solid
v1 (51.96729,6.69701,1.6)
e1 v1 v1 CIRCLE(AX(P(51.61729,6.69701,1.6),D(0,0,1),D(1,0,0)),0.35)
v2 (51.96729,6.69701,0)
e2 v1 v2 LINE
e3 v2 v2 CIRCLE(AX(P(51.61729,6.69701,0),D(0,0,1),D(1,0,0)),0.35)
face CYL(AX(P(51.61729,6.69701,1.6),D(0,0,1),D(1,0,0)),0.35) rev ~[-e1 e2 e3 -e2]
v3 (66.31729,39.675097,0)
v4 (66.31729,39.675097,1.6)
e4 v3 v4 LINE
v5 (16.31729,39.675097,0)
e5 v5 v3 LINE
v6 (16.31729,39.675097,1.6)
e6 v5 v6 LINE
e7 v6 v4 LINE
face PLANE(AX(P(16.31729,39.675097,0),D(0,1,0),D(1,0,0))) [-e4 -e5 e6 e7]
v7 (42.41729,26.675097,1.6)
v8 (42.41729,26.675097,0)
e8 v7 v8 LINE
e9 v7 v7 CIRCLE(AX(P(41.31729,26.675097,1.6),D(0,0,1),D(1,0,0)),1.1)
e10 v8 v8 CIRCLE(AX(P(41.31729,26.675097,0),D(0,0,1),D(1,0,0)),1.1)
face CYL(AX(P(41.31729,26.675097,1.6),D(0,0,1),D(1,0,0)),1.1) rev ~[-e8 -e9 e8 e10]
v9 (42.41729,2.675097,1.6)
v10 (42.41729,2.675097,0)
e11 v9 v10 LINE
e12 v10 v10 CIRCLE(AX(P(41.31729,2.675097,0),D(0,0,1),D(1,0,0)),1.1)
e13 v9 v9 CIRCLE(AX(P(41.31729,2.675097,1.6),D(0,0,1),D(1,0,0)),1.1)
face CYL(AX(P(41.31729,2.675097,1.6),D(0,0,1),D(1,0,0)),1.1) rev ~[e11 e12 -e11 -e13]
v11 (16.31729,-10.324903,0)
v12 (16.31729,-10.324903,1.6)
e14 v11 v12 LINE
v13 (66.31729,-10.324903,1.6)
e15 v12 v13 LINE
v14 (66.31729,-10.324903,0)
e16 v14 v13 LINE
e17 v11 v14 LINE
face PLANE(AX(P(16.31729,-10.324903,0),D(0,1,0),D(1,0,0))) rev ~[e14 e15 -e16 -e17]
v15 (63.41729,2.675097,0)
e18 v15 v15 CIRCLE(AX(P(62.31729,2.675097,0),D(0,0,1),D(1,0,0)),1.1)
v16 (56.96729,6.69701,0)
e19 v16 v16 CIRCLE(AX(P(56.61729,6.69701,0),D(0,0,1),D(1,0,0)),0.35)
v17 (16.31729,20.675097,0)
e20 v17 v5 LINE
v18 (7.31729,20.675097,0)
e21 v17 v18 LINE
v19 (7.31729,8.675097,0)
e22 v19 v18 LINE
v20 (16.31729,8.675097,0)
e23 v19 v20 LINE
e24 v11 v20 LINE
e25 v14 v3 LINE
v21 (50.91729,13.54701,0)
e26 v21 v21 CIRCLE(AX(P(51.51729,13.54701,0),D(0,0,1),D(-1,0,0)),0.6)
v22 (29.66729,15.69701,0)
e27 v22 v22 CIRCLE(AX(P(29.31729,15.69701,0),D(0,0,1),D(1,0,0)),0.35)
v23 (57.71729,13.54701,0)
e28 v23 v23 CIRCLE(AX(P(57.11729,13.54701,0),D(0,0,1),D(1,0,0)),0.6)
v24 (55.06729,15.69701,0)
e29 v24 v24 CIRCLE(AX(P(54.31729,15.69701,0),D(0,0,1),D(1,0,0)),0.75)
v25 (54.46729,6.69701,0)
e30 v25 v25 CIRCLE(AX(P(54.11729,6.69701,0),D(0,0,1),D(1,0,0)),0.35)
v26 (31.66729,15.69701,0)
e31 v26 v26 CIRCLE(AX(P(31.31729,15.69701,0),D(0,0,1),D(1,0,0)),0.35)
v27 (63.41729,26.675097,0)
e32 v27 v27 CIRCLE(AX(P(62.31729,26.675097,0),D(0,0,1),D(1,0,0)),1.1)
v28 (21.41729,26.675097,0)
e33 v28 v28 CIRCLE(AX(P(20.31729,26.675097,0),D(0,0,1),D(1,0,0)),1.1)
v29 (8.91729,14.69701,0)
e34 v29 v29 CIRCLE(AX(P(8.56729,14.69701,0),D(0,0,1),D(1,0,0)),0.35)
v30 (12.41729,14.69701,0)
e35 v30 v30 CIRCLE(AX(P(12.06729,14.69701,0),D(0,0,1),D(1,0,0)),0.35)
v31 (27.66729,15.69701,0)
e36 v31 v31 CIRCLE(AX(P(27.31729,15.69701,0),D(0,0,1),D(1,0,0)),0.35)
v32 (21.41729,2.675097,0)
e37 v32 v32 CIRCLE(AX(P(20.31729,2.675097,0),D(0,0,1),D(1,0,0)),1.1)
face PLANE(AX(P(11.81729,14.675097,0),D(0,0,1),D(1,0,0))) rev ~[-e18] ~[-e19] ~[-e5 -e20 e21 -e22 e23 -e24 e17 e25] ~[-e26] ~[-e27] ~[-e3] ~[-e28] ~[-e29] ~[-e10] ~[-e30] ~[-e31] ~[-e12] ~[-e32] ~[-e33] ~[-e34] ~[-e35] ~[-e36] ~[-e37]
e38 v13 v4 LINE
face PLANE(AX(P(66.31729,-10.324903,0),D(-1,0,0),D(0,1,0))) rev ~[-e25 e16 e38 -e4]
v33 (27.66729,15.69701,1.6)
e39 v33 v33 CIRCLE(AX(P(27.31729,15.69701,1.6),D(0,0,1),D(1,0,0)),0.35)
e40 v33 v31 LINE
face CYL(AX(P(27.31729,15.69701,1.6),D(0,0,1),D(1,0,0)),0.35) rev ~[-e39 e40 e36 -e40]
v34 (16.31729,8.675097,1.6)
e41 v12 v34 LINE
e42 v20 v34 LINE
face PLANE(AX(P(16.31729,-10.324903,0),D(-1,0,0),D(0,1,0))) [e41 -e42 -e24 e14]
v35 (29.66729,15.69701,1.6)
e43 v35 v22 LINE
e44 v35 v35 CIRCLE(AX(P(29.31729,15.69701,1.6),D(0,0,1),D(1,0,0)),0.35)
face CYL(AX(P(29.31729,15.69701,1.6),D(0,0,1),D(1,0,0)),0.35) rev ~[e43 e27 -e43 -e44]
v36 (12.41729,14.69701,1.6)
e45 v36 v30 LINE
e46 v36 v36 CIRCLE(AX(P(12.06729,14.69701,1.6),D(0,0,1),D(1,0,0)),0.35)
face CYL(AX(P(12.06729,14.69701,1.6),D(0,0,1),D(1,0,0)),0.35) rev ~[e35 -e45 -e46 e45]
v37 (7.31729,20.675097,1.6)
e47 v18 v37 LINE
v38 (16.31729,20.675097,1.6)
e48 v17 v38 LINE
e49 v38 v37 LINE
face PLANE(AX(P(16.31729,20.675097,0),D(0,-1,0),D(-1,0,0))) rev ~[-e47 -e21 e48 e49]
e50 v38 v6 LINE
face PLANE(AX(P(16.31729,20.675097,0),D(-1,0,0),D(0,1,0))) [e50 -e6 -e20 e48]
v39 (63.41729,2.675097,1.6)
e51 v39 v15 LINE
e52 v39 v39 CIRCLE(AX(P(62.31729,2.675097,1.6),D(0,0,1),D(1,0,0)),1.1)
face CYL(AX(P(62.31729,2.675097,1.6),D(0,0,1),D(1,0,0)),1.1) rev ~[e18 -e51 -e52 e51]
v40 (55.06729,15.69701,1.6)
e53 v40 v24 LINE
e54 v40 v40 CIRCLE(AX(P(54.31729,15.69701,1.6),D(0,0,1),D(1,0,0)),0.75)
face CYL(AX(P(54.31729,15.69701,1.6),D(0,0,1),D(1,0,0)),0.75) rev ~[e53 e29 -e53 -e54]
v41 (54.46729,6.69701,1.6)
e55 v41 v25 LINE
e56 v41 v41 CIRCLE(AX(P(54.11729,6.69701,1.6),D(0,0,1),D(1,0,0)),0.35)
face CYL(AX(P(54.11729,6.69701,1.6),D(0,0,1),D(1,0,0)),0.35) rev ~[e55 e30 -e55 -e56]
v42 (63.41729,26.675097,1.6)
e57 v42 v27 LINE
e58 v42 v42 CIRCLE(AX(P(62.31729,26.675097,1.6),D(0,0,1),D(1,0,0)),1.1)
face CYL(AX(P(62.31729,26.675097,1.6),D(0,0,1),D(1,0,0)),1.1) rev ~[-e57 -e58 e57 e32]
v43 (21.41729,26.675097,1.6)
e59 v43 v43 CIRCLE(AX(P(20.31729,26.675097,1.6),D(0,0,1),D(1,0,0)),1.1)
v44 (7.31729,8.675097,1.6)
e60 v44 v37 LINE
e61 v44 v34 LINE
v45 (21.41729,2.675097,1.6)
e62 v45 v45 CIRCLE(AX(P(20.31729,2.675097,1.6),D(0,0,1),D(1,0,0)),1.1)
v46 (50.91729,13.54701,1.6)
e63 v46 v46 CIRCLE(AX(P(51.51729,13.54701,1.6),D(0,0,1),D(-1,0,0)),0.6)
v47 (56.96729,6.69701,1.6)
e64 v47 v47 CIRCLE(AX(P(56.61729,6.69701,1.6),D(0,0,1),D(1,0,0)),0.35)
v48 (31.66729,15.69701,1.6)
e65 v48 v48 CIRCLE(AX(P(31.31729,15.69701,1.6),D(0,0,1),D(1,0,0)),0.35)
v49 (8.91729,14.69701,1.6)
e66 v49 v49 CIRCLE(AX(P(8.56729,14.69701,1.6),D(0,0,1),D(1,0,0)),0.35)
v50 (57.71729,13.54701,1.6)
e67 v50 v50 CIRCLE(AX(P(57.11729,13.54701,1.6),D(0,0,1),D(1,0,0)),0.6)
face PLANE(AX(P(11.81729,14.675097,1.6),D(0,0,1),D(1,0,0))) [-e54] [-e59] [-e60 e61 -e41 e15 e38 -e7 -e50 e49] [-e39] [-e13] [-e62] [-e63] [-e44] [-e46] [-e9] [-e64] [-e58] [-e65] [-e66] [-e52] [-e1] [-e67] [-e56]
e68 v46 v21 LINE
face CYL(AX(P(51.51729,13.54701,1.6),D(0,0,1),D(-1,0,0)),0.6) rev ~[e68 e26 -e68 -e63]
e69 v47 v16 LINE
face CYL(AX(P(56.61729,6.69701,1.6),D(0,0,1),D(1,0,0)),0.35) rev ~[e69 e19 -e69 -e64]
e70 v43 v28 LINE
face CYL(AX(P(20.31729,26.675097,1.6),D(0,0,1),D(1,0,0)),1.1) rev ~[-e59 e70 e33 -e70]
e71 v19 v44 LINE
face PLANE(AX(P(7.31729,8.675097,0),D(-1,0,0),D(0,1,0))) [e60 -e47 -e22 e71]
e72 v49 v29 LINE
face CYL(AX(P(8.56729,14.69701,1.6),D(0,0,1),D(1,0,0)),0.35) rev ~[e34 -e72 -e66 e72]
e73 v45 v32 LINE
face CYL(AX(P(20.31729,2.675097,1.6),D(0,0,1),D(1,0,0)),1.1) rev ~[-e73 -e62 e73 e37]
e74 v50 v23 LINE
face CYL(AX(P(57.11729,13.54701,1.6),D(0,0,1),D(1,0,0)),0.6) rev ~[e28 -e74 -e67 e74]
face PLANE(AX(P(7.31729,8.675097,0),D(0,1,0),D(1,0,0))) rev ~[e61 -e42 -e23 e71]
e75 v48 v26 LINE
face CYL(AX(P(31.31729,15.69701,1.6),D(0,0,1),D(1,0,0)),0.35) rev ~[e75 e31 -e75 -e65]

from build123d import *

# Parameters (mm, degrees)
F0_W     = 9
F0_H     = 12
F0_W_2   = 50
F0_H_2   = 19
F1_DEPTH = 1.6
F4_R     = 0.35
F5_R     = 0.35
F2_R     = 0.35
F6_DEPTH = 4
F7_R     = 1.1
F8_DEPTH = 25


# Not quite as in the source:
# - a feature names something its author has since deleted; it is built from what else it names


with BuildPart() as f1:
    # F0 (on Top) → F1 (new body)
    with BuildSketch(Plane.XY):
        with Locations((11.8172904253, 14.6750973295)):
            Rectangle(F0_W, F0_H)
        with Locations((41.3172904253, 14.6750973295)):
            Rectangle(F0_W_2, F0_H)
        with Locations((41.3172904253, -0.8249026705)):
            Rectangle(F0_W_2, F0_H_2)
        with Locations((41.3172904253, 30.1750973295)):
            Rectangle(F0_W_2, F0_H_2)
    extrude(amount=F1_DEPTH)

    # F4 (on face) + F5 (on face) + F3 (on face) + F2 (on face) → F6 (cut)
    with BuildSketch(Plane.XY.offset(1.6)):
        with Locations((51.6172904253, 6.6970097786)):
            Circle(F4_R)
        with Locations((56.6172904253, 6.6970097786)):
            Circle(F4_R)
        with Locations((54.1172904253, 6.6970097786)):
            Circle(F4_R)
    with BuildSketch(Plane.XY.offset(1.6)):
        with Locations((8.5672904253, 14.6970097786)):
            Circle(F5_R)
        with Locations((12.0672904253, 14.6970097786)):
            Circle(F5_R)
    with BuildSketch(Plane.XY.offset(1.6)):
        with BuildLine():
            Line((54.8172904253, 15.4470097786), (53.8172904253, 15.4470097786))
            ThreePointArc((53.8172904253, 15.4470097786), (53.640513733, 15.5202330803), (53.5672904253, 15.6970097701))
            ThreePointArc((53.5672904253, 15.6970097701), (54.3172904296, 14.9470097786), (55.0672904253, 15.6970097786))
            ThreePointArc((55.0672904253, 15.6970097786), (54.9940671206, 15.5202330833), (54.8172904253, 15.4470097786))
        make_face()
        with BuildLine():
            ThreePointArc((53.5672904253, 15.6970097701), (53.640513733, 15.5202330803), (53.8172904253, 15.4470097786))
            Line((53.8172904253, 15.4470097786), (54.8172904253, 15.4470097786))
            ThreePointArc((54.8172904253, 15.4470097786), (54.9940671206, 15.5202330833), (55.0672904253, 15.6970097786))
            ThreePointArc((55.0672904253, 15.6970097786), (54.9940671206, 15.8737864739), (54.8172904253, 15.9470097786))
            Line((54.8172904253, 15.9470097786), (53.8172904253, 15.9470097786))
            ThreePointArc((53.8172904253, 15.9470097786), (53.640513727, 15.8737864709), (53.5672904253, 15.6970097701))
        make_face()
        with BuildLine():
            ThreePointArc((55.0672904253, 15.6970097786), (54.317290421, 16.4470097786), (53.5672904253, 15.6970097701))
            ThreePointArc((53.5672904253, 15.6970097701), (53.640513727, 15.8737864709), (53.8172904253, 15.9470097786))
            Line((53.8172904253, 15.9470097786), (54.8172904253, 15.9470097786))
            ThreePointArc((54.8172904253, 15.9470097786), (54.9940671206, 15.8737864739), (55.0672904253, 15.6970097786))
        make_face()
        with BuildLine():
            Line((51.1672904253, 13.7970097786), (51.8672904253, 13.7970097786))
            ThreePointArc((51.8672904253, 13.7970097786), (52.0440671206, 13.7237864739), (52.1172904253, 13.5470097786))
            ThreePointArc((52.1172904253, 13.5470097786), (51.5172904253, 14.1470097786), (50.9172904253, 13.5470097786))
            ThreePointArc((50.9172904253, 13.5470097786), (50.99051373, 13.7237864739), (51.1672904253, 13.7970097786))
        make_face()
        with BuildLine():
            ThreePointArc((52.1172904253, 13.5470097786), (52.0440671206, 13.7237864739), (51.8672904253, 13.7970097786))
            Line((51.8672904253, 13.7970097786), (51.1672904253, 13.7970097786))
            ThreePointArc((51.1672904253, 13.7970097786), (50.99051373, 13.7237864739), (50.9172904253, 13.5470097786))
            ThreePointArc((50.9172904253, 13.5470097786), (50.99051373, 13.3702330833), (51.1672904253, 13.2970097786))
            Line((51.1672904253, 13.2970097786), (51.8672904253, 13.2970097786))
            ThreePointArc((51.8672904253, 13.2970097786), (52.0440671206, 13.3702330833), (52.1172904253, 13.5470097786))
        make_face()
        with BuildLine():
            ThreePointArc((50.9172904253, 13.5470097786), (51.5172904253, 12.9470097786), (52.1172904253, 13.5470097786))
            ThreePointArc((52.1172904253, 13.5470097786), (52.0440671206, 13.3702330833), (51.8672904253, 13.2970097786))
            Line((51.8672904253, 13.2970097786), (51.1672904253, 13.2970097786))
            ThreePointArc((51.1672904253, 13.2970097786), (50.99051373, 13.3702330833), (50.9172904253, 13.5470097786))
        make_face()
        with BuildLine():
            Line((56.7672904253, 13.2970097786), (57.4672904253, 13.2970097786))
            ThreePointArc((57.4672904253, 13.2970097786), (57.6440671206, 13.3702330833), (57.7172904253, 13.5470097786))
            ThreePointArc((57.7172904253, 13.5470097786), (57.6440671206, 13.7237864739), (57.4672904253, 13.7970097786))
            Line((57.4672904253, 13.7970097786), (56.7672904253, 13.7970097786))
            ThreePointArc((56.7672904253, 13.7970097786), (56.59051373, 13.7237864739), (56.5172904253, 13.5470097786))
            ThreePointArc((56.5172904253, 13.5470097786), (56.59051373, 13.3702330833), (56.7672904253, 13.2970097786))
        make_face()
        with BuildLine():
            ThreePointArc((57.7172904253, 13.5470097786), (57.6440671206, 13.3702330833), (57.4672904253, 13.2970097786))
            Line((57.4672904253, 13.2970097786), (56.7672904253, 13.2970097786))
            ThreePointArc((56.7672904253, 13.2970097786), (56.59051373, 13.3702330833), (56.5172904253, 13.5470097786))
            ThreePointArc((56.5172904253, 13.5470097786), (57.1172904253, 12.9470097786), (57.7172904253, 13.5470097786))
        make_face()
        with BuildLine():
            ThreePointArc((57.4672904253, 13.7970097786), (57.6440671206, 13.7237864739), (57.7172904253, 13.5470097786))
            ThreePointArc((57.7172904253, 13.5470097786), (57.1172904253, 14.1470097786), (56.5172904253, 13.5470097786))
            ThreePointArc((56.5172904253, 13.5470097786), (56.59051373, 13.7237864739), (56.7672904253, 13.7970097786))
            Line((56.7672904253, 13.7970097786), (57.4672904253, 13.7970097786))
        make_face()
    with BuildSketch(Plane.XY.offset(1.6)):
        with Locations((27.3172904253, 15.6970097786)):
            Circle(F2_R)
        with Locations((29.3172904253, 15.6970097786)):
            Circle(F2_R)
        with Locations((31.3172904253, 15.6970097786)):
            Circle(F2_R)
    extrude(amount=-F6_DEPTH, mode=Mode.SUBTRACT)

    # F7 (on face) → F8 (cut)
    with BuildSketch(Plane.XY.offset(1.6)):
        with Locations((62.3172904253, 26.6750973295)):
            Circle(F7_R)
        with Locations((20.3172904253, 26.6750973295)):
            Circle(F7_R)
        with Locations((62.3172904253, 2.6750973295)):
            Circle(F7_R)
        with Locations((20.3172904253, 2.6750973295)):
            Circle(F7_R)
        with Locations((41.3172904253, 2.6750973295)):
            Circle(F7_R)
        with Locations((41.3172904253, 26.6750973295)):
            Circle(F7_R)
    extrude(amount=-F8_DEPTH, mode=Mode.SUBTRACT)


solid = f1.part
